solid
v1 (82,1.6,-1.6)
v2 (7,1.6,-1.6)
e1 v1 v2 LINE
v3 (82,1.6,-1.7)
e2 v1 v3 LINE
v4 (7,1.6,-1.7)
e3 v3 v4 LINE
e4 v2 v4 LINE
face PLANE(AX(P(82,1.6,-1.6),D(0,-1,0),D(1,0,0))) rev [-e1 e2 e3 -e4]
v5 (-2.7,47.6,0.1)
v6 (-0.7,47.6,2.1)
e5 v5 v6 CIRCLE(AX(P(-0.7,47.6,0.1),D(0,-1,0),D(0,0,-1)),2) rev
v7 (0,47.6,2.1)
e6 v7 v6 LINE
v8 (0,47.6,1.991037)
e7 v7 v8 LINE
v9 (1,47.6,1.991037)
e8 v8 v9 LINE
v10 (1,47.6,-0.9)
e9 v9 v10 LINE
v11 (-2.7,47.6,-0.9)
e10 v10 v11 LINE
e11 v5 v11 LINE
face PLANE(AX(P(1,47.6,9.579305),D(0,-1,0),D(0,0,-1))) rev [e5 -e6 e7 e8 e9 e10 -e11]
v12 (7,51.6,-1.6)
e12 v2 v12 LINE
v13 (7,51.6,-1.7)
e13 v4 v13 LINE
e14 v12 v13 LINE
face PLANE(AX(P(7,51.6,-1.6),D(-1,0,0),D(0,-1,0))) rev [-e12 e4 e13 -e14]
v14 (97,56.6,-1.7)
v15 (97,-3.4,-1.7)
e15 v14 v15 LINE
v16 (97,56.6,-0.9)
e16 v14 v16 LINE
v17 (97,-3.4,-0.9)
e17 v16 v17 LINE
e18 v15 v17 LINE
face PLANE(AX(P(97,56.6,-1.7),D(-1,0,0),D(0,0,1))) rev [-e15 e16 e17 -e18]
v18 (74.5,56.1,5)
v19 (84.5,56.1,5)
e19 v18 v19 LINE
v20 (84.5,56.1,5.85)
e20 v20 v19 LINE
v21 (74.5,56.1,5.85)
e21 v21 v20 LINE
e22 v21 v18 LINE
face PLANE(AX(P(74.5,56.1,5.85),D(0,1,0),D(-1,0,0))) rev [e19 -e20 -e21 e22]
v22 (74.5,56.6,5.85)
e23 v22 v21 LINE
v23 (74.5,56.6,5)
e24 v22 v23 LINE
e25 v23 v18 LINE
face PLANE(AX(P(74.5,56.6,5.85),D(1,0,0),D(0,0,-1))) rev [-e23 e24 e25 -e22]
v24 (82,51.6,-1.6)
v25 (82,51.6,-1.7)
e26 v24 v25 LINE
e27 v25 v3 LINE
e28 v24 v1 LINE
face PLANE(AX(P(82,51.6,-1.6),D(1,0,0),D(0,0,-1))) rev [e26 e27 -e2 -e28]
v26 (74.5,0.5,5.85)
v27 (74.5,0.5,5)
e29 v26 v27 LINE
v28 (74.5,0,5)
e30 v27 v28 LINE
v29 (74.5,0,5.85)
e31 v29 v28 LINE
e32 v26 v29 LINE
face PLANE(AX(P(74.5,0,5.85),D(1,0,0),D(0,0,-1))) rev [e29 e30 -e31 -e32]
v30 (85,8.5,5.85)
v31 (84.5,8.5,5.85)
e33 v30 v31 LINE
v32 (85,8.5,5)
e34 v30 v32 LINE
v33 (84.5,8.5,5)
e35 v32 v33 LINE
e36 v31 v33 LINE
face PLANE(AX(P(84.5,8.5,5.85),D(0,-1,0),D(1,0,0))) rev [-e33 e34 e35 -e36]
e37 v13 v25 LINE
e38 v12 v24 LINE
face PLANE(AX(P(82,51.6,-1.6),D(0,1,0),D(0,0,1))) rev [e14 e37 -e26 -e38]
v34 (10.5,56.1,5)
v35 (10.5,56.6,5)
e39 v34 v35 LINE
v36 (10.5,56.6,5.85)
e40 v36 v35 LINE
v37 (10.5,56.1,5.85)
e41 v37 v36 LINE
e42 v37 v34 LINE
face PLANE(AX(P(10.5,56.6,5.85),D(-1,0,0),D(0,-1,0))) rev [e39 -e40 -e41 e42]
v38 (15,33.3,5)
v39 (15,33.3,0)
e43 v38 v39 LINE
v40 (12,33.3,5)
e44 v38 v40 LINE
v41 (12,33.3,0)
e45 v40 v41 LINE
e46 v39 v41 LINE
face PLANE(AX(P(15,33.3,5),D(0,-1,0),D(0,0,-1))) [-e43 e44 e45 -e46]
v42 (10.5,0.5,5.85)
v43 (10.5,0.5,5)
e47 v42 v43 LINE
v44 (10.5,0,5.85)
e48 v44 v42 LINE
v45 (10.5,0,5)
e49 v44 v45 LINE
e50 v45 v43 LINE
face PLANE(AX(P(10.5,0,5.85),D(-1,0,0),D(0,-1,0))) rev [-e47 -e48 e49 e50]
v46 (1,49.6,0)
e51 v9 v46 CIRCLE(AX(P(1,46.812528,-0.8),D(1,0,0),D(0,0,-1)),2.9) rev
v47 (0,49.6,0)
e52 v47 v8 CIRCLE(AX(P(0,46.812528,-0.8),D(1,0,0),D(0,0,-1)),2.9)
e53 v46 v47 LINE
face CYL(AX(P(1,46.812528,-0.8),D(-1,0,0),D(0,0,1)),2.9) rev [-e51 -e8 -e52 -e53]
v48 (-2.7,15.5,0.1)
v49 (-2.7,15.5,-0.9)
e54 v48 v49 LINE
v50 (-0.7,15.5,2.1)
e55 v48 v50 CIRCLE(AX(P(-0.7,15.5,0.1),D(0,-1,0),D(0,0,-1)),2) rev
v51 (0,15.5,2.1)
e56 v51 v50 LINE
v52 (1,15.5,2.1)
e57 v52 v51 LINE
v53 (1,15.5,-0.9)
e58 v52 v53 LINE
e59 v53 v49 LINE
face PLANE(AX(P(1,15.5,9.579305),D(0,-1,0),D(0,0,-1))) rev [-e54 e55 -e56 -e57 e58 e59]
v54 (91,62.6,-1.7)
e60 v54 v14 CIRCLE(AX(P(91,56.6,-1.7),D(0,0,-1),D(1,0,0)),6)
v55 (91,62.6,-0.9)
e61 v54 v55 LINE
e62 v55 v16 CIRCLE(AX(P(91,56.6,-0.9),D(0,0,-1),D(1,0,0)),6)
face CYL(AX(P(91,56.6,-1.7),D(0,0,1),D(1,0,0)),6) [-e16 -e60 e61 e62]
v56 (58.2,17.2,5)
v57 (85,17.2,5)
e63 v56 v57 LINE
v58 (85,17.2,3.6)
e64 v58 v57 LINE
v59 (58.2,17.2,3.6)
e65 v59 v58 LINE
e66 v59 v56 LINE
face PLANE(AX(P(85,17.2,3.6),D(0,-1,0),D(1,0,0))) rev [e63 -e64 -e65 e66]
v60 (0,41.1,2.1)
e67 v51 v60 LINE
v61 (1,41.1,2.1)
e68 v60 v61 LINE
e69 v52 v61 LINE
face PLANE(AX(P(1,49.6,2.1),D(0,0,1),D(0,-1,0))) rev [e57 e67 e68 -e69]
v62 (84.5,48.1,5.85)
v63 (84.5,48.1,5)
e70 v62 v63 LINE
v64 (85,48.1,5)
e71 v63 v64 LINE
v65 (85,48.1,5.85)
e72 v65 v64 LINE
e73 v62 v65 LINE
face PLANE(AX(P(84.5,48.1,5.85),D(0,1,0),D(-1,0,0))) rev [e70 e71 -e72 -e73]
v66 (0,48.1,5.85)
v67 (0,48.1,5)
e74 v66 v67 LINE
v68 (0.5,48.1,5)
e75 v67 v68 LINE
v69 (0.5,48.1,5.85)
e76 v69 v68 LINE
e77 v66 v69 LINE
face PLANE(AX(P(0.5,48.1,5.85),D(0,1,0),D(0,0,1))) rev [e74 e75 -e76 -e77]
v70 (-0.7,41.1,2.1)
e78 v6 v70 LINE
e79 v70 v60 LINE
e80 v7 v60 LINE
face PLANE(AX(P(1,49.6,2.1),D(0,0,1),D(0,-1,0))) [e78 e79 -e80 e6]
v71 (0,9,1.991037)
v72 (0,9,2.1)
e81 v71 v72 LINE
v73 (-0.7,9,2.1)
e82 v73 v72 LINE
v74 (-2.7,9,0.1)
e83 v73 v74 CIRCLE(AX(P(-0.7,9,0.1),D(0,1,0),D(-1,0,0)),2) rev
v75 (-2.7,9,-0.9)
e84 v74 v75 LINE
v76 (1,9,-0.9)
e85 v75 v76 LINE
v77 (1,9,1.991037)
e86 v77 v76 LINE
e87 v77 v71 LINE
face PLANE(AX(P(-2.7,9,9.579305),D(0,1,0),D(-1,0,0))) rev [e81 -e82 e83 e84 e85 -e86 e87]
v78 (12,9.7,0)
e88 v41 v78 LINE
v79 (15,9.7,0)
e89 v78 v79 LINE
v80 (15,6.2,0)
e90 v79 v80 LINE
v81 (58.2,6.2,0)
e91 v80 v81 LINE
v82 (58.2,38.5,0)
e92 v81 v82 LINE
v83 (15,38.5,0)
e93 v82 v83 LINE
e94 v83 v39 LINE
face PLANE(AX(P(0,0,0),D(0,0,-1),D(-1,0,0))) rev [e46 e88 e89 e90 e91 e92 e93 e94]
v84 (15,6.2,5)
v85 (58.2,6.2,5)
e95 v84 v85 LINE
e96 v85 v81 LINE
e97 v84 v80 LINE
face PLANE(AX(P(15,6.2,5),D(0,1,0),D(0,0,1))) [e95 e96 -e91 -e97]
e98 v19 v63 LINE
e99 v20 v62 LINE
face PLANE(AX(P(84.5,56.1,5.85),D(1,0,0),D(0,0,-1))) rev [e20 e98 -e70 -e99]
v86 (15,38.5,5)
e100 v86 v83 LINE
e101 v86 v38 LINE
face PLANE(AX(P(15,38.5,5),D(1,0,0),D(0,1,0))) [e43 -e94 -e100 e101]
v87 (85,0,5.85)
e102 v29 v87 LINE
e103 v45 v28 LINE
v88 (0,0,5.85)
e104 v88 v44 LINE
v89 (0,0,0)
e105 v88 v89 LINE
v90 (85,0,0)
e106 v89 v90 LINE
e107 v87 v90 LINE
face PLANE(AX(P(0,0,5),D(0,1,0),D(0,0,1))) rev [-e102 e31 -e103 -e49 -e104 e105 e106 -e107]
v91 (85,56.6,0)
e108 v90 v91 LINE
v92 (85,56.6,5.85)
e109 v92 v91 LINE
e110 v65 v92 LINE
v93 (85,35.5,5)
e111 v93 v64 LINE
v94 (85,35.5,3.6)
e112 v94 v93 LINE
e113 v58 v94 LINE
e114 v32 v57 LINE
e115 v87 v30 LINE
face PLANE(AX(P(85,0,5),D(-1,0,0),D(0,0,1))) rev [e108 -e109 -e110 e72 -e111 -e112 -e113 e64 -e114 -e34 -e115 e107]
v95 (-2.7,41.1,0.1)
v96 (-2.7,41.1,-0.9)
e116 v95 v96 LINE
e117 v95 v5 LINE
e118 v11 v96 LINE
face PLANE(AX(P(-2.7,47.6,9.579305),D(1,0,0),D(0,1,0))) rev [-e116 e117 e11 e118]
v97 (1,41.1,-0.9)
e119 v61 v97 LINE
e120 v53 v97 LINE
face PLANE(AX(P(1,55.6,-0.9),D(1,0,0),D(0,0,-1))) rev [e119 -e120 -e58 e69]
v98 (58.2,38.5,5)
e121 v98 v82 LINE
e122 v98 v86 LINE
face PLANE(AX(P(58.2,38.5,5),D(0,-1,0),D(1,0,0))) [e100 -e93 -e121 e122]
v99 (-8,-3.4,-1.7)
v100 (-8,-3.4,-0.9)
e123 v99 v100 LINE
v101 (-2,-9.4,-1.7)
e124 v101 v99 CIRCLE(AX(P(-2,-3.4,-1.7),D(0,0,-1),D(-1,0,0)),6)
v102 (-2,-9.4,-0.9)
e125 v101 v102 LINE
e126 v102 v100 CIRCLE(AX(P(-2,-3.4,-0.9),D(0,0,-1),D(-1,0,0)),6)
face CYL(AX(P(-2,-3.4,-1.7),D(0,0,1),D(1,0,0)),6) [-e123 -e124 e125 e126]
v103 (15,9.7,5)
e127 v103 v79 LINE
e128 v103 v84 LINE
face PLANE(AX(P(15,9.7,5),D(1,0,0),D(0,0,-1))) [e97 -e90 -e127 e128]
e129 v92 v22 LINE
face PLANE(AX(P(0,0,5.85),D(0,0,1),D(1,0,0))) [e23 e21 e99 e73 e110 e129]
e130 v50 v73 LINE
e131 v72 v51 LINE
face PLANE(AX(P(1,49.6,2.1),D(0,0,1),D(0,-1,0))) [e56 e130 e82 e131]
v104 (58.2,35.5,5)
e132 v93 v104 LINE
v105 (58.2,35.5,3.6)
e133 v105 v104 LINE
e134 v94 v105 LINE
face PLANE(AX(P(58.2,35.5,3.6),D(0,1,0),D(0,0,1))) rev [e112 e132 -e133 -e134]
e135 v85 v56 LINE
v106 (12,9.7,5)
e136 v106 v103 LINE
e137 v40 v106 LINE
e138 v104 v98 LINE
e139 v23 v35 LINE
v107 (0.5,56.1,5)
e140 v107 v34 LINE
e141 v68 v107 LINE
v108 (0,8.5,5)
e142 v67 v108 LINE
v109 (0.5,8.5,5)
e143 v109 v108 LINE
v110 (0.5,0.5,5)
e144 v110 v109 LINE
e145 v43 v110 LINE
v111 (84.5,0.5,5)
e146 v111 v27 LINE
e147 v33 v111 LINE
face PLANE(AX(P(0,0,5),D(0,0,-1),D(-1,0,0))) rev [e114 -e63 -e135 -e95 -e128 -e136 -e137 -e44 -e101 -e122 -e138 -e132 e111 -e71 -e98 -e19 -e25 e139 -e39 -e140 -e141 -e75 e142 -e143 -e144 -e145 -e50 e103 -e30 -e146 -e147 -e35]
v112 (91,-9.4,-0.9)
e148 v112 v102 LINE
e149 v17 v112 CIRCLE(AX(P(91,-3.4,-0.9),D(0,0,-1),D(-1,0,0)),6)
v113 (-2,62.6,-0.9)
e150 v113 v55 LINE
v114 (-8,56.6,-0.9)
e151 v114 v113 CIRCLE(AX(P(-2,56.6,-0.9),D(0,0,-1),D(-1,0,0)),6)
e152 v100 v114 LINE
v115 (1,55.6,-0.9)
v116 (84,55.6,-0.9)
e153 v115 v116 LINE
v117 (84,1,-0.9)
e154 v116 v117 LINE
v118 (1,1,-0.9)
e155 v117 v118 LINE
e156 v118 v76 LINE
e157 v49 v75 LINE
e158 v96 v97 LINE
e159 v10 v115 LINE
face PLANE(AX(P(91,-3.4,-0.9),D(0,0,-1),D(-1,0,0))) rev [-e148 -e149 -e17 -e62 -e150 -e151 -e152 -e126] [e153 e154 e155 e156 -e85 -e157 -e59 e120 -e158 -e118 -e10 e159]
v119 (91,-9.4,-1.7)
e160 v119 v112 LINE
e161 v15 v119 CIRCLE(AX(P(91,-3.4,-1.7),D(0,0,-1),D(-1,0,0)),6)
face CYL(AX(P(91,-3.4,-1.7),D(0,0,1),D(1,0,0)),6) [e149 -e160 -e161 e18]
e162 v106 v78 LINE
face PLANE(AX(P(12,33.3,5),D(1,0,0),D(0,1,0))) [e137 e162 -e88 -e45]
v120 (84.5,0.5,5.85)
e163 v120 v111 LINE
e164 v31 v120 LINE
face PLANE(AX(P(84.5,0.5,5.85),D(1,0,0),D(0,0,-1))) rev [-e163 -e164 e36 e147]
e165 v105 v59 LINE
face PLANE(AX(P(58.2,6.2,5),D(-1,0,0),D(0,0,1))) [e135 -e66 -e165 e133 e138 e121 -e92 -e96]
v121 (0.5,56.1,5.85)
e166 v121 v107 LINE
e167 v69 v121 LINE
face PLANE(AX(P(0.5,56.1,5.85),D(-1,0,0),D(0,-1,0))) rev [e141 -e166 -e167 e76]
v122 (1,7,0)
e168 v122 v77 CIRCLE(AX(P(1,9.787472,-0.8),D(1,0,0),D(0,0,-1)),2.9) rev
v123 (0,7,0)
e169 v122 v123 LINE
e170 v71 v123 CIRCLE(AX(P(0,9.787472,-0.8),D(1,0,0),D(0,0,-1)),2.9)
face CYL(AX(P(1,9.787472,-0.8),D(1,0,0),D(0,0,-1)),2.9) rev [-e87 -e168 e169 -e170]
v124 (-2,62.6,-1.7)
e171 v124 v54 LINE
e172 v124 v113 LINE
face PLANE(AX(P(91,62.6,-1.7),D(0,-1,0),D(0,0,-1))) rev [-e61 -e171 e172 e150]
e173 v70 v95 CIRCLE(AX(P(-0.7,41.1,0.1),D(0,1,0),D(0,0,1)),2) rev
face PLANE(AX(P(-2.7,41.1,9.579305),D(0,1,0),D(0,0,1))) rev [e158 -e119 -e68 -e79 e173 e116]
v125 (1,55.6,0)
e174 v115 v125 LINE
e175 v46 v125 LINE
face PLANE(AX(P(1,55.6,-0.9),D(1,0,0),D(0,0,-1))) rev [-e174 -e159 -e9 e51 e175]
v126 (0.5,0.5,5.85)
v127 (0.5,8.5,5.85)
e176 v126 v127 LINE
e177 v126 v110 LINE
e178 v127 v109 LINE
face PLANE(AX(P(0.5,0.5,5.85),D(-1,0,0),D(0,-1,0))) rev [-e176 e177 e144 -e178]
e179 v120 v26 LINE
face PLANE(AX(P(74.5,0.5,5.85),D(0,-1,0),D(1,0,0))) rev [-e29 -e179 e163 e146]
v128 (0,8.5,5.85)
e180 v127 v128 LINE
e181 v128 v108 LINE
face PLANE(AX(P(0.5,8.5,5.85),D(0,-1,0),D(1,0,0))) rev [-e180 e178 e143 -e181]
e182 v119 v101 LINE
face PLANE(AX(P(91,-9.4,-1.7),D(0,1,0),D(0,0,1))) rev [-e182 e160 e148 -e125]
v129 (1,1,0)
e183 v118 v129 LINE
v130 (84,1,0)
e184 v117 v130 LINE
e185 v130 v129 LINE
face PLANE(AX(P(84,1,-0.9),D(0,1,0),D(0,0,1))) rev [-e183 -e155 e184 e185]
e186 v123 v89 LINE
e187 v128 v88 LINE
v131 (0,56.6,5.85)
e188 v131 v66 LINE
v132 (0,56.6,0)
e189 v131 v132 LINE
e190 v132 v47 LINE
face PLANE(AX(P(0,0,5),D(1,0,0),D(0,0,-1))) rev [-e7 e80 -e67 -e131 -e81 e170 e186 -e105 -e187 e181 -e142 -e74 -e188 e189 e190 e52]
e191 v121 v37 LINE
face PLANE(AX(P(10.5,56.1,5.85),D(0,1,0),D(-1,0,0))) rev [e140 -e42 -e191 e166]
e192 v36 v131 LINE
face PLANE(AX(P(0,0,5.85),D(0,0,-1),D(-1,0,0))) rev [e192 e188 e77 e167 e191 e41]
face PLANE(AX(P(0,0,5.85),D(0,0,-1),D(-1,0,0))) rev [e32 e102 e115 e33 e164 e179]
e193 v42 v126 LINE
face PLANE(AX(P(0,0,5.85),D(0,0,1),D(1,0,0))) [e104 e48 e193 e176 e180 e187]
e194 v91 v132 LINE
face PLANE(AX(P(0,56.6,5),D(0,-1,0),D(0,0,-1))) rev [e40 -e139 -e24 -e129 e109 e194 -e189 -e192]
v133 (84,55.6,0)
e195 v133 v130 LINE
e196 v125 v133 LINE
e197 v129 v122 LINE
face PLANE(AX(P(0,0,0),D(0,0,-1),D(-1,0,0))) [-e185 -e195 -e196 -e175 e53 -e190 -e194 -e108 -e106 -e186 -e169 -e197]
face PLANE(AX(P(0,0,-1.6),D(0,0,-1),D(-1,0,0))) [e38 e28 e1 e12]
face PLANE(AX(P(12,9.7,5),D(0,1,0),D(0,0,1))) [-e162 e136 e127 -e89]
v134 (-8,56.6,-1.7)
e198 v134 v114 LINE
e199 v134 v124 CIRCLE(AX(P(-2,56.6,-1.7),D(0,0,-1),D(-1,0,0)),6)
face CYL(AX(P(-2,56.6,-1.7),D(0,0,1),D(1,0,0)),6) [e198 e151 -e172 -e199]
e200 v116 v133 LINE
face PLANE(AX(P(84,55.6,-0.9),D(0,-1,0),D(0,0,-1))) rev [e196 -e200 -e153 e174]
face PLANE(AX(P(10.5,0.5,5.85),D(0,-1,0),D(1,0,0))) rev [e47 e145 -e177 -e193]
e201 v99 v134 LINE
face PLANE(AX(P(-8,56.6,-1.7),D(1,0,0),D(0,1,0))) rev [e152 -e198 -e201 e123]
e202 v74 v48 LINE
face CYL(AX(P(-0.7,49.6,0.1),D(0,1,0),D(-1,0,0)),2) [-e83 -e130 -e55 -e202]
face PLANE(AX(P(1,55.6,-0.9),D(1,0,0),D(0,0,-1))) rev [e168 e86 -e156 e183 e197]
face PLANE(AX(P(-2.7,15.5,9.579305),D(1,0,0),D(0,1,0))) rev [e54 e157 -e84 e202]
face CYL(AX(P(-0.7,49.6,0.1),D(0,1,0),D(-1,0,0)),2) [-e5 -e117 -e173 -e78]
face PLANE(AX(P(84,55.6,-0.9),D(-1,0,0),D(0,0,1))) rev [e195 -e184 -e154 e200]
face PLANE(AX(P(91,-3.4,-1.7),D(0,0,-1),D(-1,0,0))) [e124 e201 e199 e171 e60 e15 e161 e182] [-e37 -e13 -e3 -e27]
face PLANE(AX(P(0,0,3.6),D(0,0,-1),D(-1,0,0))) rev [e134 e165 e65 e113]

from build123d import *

# Parameters (mm, degrees)
CROQUIS1_W              = 85
CROQUIS1_H              = 56.6
SALIENTE_EXTRUIR1_DEPTH = 5
SALIENTE_EXTRUIR2_DEPTH = 0.85
CROQUIS3_W              = 83
CROQUIS3_H              = 54.6
SALIENTE_EXTRUIR3_DEPTH = 0.9
SALIENTE_EXTRUIR4_DEPTH = 0.8
CROQUIS5_W              = 75
CROQUIS5_H              = 50
CORTAR_EXTRUIR1_DEPTH   = 0.1
CROQUIS6_W              = 26.8
CROQUIS6_H              = 18.3
CORTAR_EXTRUIR2_DEPTH   = 1.4
CROQUIS7_W              = 2.1
CROQUIS7_H              = 42.6
CORTAR_EXTRUIR3_DEPTH   = 1
REDONDEO1_R             = 2.9
SALIENTE_EXTRUIR5_REACH = 117.643
CROQUIS8_W              = 3.7
CROQUIS8_H              = 6.5
REDONDEO2_R             = 2


with BuildPart() as part:
    # Croquis1 → Saliente-Extruir1 (new body)
    with BuildSketch(Plane.XY):
        with Locations((42.5, 28.3)):
            Rectangle(CROQUIS1_W, CROQUIS1_H)
        Polygon((12, 33.3), (12, 9.7), (15, 9.7), (15, 6.2), (58.2, 6.2), (58.2, 38.5), (15, 38.5), (15, 33.3), align=None, mode=Mode.SUBTRACT)
    extrude(amount=SALIENTE_EXTRUIR1_DEPTH)

    # Croquis2 → Saliente-Extruir2 (add)
    with BuildSketch(Plane.XY.offset(5)):
        Polygon((0, 56.6), (10.5, 56.6), (10.5, 56.1), (0.5, 56.1), (0.5, 48.1), (0, 48.1), align=None)
        Polygon((85, 48.1), (85, 56.6), (74.5, 56.6), (74.5, 56.1), (84.5, 56.1), (84.5, 48.1), align=None)
        Polygon((85, 0), (74.5, 0), (74.5, 0.5), (84.5, 0.5), (84.5, 8.5), (85, 8.5), align=None)
        Polygon((0, 8.5), (0, 0), (10.5, 0), (10.5, 0.5), (0.5, 0.5), (0.5, 8.5), align=None)
    extrude(amount=SALIENTE_EXTRUIR2_DEPTH)

    # Croquis3 → Saliente-Extruir3 (add)
    with BuildSketch(Plane(origin=(0, 0, 0), x_dir=(-1, 0, 0), z_dir=(0, 0, -1))):
        with Locations((-42.5, 28.3)):
            Rectangle(CROQUIS3_W, CROQUIS3_H)
    extrude(amount=SALIENTE_EXTRUIR3_DEPTH)

    # Croquis4 → Saliente-Extruir4 (add)
    with BuildSketch(Plane(origin=(0, 0, -0.9), x_dir=(-1, 0, 0), z_dir=(0, 0, -1))):
        with BuildLine():
            Line((-91, 62.6), (2, 62.6))
            ThreePointArc((2, 62.6), (6.242640687, 60.842640687), (8, 56.6))
            Line((8, 56.6), (8, -3.4))
            ThreePointArc((8, -3.4), (6.242640687, -7.642640687), (2, -9.4))
            Line((2, -9.4), (-91, -9.4))
            ThreePointArc((-91, -9.4), (-95.242640687, -7.642640687), (-97, -3.4))
            Line((-97, -3.4), (-97, 56.6))
            ThreePointArc((-97, 56.6), (-95.242640687, 60.842640687), (-91, 62.6))
        make_face()
    extrude(amount=SALIENTE_EXTRUIR4_DEPTH)

    # Croquis5 → Cortar-Extruir1 (cut)
    with BuildSketch(Plane(origin=(0, 0, -1.7), x_dir=(-1, 0, 0), z_dir=(0, 0, -1))):
        with Locations((-44.5, 26.6)):
            Rectangle(CROQUIS5_W, CROQUIS5_H)
    extrude(amount=-CORTAR_EXTRUIR1_DEPTH, mode=Mode.SUBTRACT)

    # Croquis6 → Cortar-Extruir2 (cut)
    with BuildSketch(Plane.XY.offset(5)):
        with Locations((71.6, 26.35)):
            Rectangle(CROQUIS6_W, CROQUIS6_H)
    extrude(amount=-CORTAR_EXTRUIR2_DEPTH, mode=Mode.SUBTRACT)

    # Croquis7 → Cortar-Extruir3 (cut)
    with BuildSketch(Plane.ZY):
        with Locations((1.05, 28.3)):
            Rectangle(CROQUIS7_W, CROQUIS7_H)
    extrude(amount=-CORTAR_EXTRUIR3_DEPTH, mode=Mode.SUBTRACT)

    # Redondeo1
    # the kernel refuses this fillet: 2.9 mm, written as the material it adds along each edge
    with BuildSketch(Plane(origin=(0, 7, 2.1), x_dir=(0, 0, -1), z_dir=(1, 0, 0))) as redondeo1_piece_1:
        with BuildLine():
            CenterArc((2.9, 2.787471973), REDONDEO1_R, 180, 73.986605576)
            Line((0, 2.787471973), (-0.058, 2.787471973))
            Line((-0.058, 2.787471973), (-0.058, 0))
            Line((-0.058, 0), (0, -0.058))
            ThreePointArc((0, -0.058), (1.05, -0.058), (2.084, -0.055749439))
            Line((2.084, -0.055749439), (2.1, 0))
        make_face()
    extrude(amount=7.968679932)
    with BuildSketch(Plane(origin=(0, 49.6, 2.1), x_dir=(0, 0, -1), z_dir=(1, 0, 0))) as redondeo1_piece_2:
        with BuildLine():
            CenterArc((2.9, -2.787471973), REDONDEO1_R, 106.013394424, 73.986605576)
            Line((0, -2.787471973), (-0.058, -2.787471973))
            Line((-0.058, -2.787471973), (-0.058, 0))
            Line((-0.058, 0), (0, 0.058))
            ThreePointArc((0, 0.058), (1.05, 0.058), (2.084, 0.055749439))
            Line((2.084, 0.055749439), (2.1, 0))
        make_face()
    extrude(amount=7.968679932)

    # Saliente-Extruir5: up to this face of the body (flat: up to its plane)
    saliente_extruir5_end = Plane(part.part.faces().sort_by_distance((0.5, 28.3, 2.1))[0])
    # Croquis8 → Saliente-Extruir5 (add, up to the picked face)
    with BuildSketch(Plane.XY.offset(-0.9), mode=Mode.PRIVATE) as saliente_extruir5_sk1:
        with Locations((-0.85, 44.35)):
            Rectangle(CROQUIS8_W, CROQUIS8_H)
    saliente_extruir5_tool1 = split(extrude(saliente_extruir5_sk1.sketch, amount=SALIENTE_EXTRUIR5_REACH, mode=Mode.PRIVATE), bisect_by=saliente_extruir5_end, keep=Keep.BOTH, mode=Mode.PRIVATE)
    # Croquis8 → Saliente-Extruir5 (add, up to the picked face)
    with BuildSketch(Plane.XY.offset(-0.9), mode=Mode.PRIVATE) as saliente_extruir5_sk2:
        with Locations((-0.85, 12.25)):
            Rectangle(CROQUIS8_W, CROQUIS8_H)
    saliente_extruir5_tool2 = split(extrude(saliente_extruir5_sk2.sketch, amount=SALIENTE_EXTRUIR5_REACH, mode=Mode.PRIVATE), bisect_by=saliente_extruir5_end, keep=Keep.BOTH, mode=Mode.PRIVATE)
    add(saliente_extruir5_tool1.solids().sort_by(Axis((-0.85, 44.35, -0.9), (0, 0, 1)))[0])
    add(saliente_extruir5_tool2.solids().sort_by(Axis((-0.85, 12.25, -0.9), (0, 0, 1)))[0])

    # Redondeo2
    redondeo2_edges = [part.edges().sort_by_distance(p)[0] for p in [
        (-2.7, 44.35, 2.1),
        (-2.7, 12.25, 2.1),
    ]]
    fillet(redondeo2_edges, radius=REDONDEO2_R)


solid = part.part
